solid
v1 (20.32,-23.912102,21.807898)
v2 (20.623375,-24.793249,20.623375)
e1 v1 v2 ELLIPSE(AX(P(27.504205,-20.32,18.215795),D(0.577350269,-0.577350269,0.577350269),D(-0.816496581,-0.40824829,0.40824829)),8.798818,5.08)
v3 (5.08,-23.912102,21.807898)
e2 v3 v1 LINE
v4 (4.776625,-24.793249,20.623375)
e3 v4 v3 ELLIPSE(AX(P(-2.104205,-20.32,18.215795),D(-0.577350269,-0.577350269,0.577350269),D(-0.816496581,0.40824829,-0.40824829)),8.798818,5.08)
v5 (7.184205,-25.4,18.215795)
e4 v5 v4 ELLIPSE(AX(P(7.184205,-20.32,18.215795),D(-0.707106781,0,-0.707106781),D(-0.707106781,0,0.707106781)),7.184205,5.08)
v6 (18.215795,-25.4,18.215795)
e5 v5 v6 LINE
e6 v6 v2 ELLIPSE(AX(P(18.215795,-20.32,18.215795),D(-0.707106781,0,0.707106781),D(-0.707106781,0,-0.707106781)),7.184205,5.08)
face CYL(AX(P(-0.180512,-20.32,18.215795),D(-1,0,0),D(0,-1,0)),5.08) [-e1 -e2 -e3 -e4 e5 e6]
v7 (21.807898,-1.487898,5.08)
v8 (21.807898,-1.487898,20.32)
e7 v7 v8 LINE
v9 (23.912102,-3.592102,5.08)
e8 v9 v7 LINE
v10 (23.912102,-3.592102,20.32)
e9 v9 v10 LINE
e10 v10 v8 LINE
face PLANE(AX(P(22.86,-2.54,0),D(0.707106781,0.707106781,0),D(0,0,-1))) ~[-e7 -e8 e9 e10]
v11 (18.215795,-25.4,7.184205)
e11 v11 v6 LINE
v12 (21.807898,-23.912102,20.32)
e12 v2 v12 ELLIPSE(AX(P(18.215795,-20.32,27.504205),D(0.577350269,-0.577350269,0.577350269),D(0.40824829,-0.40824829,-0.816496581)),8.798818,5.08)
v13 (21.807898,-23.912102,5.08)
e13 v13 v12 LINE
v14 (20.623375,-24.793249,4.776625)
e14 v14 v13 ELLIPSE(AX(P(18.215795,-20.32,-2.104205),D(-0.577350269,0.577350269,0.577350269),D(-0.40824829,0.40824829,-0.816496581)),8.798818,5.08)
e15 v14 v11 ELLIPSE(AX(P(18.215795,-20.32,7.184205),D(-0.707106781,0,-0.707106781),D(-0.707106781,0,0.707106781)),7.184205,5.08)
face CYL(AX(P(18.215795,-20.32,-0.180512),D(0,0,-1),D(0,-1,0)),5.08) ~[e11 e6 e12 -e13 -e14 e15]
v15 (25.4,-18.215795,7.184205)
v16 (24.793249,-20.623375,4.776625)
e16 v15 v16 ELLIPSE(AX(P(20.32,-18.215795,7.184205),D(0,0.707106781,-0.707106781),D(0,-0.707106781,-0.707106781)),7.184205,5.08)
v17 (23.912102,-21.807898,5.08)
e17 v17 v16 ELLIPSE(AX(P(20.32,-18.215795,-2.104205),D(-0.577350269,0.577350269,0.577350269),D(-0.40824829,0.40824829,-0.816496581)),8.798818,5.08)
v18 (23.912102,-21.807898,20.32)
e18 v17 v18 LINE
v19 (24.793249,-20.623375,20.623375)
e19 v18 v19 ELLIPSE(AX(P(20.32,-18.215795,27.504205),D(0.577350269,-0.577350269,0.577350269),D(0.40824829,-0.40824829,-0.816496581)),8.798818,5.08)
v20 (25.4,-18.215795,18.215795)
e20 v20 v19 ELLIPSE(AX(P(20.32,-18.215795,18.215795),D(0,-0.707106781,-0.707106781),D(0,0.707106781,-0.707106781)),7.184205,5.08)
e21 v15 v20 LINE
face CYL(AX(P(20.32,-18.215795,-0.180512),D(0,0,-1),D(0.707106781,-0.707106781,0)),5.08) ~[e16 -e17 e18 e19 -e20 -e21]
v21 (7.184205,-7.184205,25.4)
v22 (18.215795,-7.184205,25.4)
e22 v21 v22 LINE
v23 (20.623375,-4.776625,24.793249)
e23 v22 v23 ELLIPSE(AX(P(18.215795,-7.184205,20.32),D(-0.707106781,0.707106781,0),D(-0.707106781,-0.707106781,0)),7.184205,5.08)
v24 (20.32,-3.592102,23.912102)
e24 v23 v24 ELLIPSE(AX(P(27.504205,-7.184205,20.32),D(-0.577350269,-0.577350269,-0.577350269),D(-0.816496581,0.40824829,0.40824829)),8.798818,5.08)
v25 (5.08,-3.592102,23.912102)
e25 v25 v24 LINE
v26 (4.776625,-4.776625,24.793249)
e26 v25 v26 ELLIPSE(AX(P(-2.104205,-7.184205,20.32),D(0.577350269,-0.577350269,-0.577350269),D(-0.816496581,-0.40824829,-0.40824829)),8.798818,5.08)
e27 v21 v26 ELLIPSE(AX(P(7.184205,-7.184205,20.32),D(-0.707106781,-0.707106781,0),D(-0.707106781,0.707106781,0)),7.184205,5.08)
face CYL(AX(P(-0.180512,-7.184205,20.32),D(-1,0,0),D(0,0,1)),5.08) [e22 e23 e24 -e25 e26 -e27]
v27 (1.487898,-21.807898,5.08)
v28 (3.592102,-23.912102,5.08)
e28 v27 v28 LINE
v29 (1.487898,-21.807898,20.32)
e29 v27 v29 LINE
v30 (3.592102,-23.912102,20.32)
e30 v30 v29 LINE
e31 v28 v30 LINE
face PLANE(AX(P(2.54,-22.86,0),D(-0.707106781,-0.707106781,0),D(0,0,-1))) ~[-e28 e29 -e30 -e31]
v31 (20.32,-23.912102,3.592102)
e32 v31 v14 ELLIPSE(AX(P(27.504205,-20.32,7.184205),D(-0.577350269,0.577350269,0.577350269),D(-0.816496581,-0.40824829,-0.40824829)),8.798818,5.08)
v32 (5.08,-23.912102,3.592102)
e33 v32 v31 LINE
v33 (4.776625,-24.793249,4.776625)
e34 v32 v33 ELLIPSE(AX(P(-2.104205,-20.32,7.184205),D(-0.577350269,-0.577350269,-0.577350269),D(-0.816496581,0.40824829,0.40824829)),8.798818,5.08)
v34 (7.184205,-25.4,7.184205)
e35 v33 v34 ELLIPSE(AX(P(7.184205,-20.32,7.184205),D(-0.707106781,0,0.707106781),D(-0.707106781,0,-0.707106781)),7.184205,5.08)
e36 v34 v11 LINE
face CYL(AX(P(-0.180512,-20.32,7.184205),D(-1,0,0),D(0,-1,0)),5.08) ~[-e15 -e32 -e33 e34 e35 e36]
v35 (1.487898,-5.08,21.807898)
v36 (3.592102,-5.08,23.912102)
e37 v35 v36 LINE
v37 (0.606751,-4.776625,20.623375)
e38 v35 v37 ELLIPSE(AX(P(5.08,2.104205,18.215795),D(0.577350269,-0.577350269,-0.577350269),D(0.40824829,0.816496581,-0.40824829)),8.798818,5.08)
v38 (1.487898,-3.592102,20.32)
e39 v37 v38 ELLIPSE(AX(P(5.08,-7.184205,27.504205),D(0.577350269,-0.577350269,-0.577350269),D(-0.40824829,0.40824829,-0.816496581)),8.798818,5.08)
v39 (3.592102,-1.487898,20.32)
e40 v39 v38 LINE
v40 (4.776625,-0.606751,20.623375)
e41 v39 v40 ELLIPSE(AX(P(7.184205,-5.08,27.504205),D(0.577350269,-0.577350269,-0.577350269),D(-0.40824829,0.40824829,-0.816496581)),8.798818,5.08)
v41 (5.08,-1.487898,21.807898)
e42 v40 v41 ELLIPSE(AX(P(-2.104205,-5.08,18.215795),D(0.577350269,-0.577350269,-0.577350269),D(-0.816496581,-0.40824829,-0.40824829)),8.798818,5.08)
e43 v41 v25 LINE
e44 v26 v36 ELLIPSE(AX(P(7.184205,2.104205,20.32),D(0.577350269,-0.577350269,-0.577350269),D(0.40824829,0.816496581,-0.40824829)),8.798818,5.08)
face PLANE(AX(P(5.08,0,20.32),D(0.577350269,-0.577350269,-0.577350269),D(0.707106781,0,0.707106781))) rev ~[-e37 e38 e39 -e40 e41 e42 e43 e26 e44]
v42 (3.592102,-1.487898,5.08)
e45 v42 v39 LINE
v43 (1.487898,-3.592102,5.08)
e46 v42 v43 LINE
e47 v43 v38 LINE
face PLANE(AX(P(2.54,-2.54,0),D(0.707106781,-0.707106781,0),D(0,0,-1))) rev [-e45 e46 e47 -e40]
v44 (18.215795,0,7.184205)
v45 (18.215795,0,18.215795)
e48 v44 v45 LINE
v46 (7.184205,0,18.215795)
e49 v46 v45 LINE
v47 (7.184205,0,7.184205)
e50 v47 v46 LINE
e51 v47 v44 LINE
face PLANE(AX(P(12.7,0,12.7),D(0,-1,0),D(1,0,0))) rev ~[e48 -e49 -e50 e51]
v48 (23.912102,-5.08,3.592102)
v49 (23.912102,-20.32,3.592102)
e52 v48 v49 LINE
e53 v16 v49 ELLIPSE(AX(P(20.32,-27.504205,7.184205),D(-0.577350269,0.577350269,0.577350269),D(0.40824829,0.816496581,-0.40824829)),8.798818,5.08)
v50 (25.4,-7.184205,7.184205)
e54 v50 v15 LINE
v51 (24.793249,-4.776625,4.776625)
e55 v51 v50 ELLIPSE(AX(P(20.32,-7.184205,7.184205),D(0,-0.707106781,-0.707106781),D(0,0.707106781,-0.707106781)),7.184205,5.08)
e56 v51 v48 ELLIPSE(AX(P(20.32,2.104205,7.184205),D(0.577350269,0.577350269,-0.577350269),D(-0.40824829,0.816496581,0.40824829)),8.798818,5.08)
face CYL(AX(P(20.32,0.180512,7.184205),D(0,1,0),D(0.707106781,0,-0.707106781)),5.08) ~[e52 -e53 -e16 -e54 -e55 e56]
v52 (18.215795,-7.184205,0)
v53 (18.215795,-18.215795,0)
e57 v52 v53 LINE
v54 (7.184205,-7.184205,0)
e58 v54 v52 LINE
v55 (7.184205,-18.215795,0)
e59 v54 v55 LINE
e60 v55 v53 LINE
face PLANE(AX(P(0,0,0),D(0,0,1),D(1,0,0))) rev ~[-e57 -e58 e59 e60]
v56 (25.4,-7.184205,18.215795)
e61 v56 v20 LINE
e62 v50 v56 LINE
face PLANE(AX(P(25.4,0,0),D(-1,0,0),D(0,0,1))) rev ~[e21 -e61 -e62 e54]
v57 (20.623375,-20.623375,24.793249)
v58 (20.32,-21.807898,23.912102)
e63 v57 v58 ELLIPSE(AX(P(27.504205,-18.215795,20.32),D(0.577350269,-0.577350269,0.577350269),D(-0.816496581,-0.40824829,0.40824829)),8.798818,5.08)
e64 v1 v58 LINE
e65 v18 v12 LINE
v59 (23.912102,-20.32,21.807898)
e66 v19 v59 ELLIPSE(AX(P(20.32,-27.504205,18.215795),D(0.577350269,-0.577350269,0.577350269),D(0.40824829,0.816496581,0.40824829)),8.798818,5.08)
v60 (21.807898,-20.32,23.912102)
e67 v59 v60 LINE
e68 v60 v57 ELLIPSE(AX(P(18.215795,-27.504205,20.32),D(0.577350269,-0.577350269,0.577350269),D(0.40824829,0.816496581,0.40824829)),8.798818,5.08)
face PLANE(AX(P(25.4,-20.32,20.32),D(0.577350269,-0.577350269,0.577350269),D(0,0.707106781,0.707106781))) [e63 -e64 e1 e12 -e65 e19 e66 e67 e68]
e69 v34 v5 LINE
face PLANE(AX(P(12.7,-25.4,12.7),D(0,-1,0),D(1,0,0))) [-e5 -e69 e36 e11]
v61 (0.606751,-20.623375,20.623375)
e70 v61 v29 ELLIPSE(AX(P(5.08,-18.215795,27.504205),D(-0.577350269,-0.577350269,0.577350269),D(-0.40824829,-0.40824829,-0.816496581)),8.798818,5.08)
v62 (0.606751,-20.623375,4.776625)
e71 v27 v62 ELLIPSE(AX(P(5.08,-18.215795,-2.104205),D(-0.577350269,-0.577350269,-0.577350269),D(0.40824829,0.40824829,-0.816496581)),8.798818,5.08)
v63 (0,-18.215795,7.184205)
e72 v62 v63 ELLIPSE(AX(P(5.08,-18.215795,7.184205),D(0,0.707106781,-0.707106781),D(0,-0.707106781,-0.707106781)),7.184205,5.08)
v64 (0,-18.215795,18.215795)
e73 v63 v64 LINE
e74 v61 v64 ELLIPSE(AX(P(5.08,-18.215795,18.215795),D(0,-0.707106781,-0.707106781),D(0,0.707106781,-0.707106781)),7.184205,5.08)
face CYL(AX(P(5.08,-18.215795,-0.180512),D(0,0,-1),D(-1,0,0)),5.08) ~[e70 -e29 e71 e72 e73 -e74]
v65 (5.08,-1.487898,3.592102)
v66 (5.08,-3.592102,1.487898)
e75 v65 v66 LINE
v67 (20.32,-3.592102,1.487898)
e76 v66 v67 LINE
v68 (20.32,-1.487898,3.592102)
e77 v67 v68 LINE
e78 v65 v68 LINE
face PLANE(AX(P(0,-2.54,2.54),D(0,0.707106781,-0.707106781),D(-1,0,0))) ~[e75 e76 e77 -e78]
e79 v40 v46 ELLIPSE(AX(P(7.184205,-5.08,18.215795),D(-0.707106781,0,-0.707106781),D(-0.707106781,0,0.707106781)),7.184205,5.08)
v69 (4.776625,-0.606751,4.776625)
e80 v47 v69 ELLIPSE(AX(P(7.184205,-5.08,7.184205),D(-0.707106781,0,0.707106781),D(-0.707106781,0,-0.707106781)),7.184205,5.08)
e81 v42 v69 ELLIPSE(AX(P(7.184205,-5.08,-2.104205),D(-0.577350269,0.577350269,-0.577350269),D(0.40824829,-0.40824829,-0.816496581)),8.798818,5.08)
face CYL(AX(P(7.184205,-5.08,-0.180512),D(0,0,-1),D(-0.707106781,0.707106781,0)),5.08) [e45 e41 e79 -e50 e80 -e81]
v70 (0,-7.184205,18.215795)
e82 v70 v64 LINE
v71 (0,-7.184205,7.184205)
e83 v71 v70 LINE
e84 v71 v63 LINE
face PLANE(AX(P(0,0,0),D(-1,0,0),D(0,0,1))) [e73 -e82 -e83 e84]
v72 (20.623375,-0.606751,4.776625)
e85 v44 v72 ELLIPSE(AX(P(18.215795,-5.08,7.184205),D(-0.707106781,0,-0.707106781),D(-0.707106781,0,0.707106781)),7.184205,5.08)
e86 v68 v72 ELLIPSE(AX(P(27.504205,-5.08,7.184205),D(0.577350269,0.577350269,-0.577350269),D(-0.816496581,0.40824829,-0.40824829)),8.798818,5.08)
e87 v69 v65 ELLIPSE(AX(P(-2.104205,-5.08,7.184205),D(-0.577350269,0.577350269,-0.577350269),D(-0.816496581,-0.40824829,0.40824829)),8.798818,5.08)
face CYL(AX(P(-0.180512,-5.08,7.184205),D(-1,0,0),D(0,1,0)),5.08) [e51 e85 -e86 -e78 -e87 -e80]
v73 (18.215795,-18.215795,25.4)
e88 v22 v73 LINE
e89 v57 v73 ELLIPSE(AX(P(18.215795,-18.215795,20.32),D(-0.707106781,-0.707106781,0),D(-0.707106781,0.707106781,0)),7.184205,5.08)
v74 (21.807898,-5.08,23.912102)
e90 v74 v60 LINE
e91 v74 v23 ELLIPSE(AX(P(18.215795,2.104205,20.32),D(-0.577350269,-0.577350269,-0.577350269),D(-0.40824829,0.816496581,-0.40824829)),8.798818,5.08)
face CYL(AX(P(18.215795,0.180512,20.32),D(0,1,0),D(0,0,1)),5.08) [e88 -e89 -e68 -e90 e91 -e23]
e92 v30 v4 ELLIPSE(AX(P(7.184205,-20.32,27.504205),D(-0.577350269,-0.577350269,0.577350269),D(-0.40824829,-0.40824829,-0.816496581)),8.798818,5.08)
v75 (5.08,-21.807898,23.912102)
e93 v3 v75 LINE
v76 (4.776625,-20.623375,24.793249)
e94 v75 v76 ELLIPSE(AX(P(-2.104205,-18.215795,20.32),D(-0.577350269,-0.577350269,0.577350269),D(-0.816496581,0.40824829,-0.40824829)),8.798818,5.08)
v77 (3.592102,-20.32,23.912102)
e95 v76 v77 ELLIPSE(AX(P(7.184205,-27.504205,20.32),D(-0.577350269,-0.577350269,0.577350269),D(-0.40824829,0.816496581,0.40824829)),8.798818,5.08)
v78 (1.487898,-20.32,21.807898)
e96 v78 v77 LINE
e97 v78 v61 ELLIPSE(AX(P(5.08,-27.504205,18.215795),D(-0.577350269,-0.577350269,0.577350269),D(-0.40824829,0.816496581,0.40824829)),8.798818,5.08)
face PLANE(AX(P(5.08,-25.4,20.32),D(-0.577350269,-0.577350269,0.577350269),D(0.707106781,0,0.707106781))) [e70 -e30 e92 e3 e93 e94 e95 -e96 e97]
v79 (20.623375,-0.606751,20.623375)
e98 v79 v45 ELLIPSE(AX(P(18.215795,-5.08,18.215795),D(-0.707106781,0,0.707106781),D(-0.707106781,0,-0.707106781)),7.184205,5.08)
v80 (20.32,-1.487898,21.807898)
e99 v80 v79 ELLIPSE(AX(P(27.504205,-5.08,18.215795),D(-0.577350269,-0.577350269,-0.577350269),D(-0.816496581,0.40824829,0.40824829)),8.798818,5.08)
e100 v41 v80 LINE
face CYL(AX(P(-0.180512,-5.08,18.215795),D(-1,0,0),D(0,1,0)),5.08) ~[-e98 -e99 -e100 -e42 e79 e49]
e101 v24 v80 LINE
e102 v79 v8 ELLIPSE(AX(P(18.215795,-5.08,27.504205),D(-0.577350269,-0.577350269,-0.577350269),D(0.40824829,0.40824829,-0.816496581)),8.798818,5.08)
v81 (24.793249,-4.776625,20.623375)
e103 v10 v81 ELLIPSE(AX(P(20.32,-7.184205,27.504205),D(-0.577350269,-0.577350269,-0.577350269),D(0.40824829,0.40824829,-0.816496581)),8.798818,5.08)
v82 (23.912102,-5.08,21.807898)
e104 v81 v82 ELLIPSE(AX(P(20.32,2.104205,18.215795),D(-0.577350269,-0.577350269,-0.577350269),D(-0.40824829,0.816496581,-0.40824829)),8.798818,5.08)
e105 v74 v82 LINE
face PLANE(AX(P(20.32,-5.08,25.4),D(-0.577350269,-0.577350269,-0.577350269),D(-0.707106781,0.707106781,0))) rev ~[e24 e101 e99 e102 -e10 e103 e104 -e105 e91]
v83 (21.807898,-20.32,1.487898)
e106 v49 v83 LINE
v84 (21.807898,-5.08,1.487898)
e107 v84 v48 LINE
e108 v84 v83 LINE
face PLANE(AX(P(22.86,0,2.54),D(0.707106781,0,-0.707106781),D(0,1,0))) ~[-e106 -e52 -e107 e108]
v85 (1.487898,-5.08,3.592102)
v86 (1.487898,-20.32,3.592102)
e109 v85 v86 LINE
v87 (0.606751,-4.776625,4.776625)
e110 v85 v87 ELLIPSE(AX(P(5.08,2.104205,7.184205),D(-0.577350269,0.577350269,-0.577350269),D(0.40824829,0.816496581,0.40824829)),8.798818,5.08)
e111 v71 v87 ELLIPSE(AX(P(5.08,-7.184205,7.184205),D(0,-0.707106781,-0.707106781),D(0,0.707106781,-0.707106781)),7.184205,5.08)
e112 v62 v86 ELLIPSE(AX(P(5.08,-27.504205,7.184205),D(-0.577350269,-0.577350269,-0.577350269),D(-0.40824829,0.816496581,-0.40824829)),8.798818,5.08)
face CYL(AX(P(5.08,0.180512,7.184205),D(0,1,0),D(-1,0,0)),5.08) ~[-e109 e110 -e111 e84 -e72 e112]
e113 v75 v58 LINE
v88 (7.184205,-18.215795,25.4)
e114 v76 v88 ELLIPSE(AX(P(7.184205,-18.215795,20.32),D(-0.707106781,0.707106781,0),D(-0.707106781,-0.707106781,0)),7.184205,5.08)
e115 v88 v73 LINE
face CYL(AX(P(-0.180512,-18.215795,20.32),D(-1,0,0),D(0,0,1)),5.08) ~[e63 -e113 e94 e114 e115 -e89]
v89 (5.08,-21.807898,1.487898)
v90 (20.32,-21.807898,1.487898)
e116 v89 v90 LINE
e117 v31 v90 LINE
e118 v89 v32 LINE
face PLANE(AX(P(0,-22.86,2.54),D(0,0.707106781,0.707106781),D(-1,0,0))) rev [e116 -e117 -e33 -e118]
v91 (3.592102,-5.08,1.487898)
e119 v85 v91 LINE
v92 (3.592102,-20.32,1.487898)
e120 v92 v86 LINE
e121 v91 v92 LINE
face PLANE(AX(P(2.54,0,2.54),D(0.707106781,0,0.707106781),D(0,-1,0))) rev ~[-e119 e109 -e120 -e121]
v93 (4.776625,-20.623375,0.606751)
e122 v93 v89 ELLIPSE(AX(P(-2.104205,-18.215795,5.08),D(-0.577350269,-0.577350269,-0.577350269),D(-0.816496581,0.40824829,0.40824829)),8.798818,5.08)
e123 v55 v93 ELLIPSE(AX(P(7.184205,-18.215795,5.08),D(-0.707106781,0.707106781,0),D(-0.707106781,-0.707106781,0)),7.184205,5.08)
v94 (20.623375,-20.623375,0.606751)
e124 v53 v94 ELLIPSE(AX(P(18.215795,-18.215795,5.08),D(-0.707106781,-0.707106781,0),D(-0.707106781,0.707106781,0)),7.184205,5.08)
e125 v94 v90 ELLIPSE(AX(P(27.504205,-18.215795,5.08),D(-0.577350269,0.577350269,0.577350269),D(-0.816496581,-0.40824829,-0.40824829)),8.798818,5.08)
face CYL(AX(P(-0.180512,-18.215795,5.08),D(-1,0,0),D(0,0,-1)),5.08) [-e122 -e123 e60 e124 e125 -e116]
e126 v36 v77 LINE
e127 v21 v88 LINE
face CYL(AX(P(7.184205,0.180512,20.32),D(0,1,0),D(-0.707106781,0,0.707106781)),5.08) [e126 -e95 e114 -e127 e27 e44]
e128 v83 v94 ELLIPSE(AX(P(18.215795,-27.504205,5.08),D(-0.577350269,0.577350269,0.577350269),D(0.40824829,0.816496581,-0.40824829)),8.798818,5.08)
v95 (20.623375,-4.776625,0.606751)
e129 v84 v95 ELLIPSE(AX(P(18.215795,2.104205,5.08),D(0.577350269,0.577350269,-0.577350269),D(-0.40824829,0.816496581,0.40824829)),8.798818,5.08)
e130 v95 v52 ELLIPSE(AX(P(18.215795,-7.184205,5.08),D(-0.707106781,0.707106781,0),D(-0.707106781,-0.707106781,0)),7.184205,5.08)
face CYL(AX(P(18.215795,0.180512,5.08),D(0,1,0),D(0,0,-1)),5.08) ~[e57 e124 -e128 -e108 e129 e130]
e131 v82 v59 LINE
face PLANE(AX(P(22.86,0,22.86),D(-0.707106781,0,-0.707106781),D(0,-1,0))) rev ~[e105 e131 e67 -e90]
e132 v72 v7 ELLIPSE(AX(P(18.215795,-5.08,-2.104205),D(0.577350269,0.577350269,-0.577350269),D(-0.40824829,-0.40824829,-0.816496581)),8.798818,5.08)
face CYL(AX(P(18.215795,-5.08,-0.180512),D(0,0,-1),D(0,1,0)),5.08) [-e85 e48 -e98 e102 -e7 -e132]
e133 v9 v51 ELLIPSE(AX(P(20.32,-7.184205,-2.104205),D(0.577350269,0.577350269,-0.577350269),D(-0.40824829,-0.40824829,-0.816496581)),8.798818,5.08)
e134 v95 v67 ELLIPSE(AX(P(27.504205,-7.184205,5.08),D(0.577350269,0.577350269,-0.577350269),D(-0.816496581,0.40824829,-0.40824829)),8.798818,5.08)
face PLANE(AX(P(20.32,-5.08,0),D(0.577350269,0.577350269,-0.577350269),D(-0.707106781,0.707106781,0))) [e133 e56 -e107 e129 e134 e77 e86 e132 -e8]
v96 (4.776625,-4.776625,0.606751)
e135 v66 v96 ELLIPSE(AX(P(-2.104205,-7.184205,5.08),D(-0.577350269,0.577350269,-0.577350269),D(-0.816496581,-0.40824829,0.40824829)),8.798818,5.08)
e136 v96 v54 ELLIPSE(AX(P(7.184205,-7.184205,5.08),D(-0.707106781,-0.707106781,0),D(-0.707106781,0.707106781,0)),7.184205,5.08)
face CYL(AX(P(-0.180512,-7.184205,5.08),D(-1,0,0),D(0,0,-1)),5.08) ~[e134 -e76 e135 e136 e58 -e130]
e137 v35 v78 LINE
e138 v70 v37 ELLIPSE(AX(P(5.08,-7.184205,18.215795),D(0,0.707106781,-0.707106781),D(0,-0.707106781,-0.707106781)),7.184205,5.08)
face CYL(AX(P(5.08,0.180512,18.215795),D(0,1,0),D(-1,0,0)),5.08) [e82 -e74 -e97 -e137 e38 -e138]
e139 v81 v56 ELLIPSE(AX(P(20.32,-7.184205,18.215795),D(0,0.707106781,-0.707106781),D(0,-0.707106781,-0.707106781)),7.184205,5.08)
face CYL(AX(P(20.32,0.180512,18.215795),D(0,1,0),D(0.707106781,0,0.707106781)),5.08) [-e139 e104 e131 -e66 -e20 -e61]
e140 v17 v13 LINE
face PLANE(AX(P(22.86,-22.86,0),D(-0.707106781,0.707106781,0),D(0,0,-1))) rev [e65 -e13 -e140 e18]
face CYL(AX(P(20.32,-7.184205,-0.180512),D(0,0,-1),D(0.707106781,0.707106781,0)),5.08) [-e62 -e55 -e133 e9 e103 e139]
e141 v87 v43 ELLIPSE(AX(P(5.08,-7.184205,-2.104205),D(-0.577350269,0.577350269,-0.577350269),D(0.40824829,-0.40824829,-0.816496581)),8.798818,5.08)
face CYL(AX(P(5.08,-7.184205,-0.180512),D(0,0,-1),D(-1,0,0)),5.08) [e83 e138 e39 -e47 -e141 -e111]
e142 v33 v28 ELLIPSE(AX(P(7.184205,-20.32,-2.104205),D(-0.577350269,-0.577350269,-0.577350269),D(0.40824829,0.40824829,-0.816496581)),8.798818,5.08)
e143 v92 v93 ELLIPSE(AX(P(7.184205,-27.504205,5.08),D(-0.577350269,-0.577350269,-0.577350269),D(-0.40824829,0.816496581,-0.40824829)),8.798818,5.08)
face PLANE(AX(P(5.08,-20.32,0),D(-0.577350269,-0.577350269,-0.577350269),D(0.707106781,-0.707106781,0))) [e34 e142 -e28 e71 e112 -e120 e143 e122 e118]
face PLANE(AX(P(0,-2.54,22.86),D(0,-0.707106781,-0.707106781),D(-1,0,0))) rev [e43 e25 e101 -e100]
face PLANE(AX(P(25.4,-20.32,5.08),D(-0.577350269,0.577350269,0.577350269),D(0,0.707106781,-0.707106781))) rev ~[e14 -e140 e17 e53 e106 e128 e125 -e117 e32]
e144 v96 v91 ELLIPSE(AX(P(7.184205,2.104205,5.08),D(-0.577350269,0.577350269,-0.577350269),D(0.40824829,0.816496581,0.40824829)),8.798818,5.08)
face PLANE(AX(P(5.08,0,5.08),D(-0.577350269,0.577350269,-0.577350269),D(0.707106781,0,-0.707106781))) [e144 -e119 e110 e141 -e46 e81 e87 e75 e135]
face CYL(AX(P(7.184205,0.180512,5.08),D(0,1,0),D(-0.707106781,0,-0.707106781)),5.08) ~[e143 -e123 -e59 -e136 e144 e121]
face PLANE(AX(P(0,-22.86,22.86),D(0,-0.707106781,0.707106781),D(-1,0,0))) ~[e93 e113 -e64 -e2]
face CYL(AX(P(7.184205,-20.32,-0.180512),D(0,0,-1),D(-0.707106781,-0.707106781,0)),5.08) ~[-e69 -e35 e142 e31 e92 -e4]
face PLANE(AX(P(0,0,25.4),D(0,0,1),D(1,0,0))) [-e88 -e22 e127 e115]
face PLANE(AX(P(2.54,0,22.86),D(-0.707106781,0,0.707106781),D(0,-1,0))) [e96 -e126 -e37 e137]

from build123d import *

# Parameters (mm, degrees)
F0_W        = 25.4
F0_H        = 25.4
F1_DEPTH    = 25.4
F2_SIZE     = 5.08
F3_T1_DEPTH = 25.7610244843
F3_T3_DEPTH = 25.7610244843
F3_T5_DEPTH = 25.7610244843


# Not quite as in the source:
# - a fillet or chamfer that OpenCascade refuses, or shapes differently, is made with other operations: its cross-section is extruded or revolved along the edge and cut away or added


with BuildPart() as f1:
    # F0 (on Front) → F1 (new body)
    with BuildSketch(Plane.XZ):
        with Locations((12.7, 12.7)):
            Rectangle(F0_W, F0_H)
    extrude(amount=F1_DEPTH)

    # F2
    f2_edges = [f1.edges().sort_by_distance(p)[0] for p in [
        (0, -12.7, 25.4),
        (0, -25.4, 12.7),
        (12.7, -25.4, 25.4),
        (0, -12.7, 0),
        (12.7, -25.4, 0),
        (0, 0, 12.7),
        (25.4, -25.4, 12.7),
        (25.4, 0, 12.7),
        (25.4, -12.7, 25.4),
        (25.4, -12.7, 0),
        (12.7, 0, 25.4),
        (12.7, 0, 0),
    ]]
    chamfer(f2_edges, length=F2_SIZE)

    # F3: fillet of radius 5.08 on 24 edges, made by hand

    # F3_s2 → F3_t1 (cut)
    with BuildSketch(Plane.YZ.offset(-0.1805122421)):
        with BuildLine():
            ThreePointArc((-25.4, 18.2157951031), (-25.0133080252, 20.1598269396), (-23.9121024484, 21.8078975516))
            Line((-23.9121024484, 21.8078975516), (-25.4, 20.32))
            Line((-25.4, 20.32), (-25.4, 18.2157951031))
        make_face()
        with BuildLine():
            ThreePointArc((-25.4, 7.1842048969), (-25.0133080252, 5.2401730604), (-23.9121024484, 3.5921024484))
            Line((-23.9121024484, 3.5921024484), (-25.4, 5.08))
            Line((-25.4, 5.08), (-25.4, 7.1842048969))
        make_face()
        with BuildLine():
            ThreePointArc((0, 18.2157951031), (-0.3866919748, 20.1598269396), (-1.4878975516, 21.8078975516))
            Line((-1.4878975516, 21.8078975516), (0, 20.32))
            Line((0, 20.32), (0, 18.2157951031))
        make_face()
        with BuildLine():
            ThreePointArc((0, 7.1842048969), (-0.3866919748, 5.2401730604), (-1.4878975516, 3.5921024484))
            Line((-1.4878975516, 3.5921024484), (0, 5.08))
            Line((0, 5.08), (0, 7.1842048969))
        make_face()
        with BuildLine():
            ThreePointArc((-18.2157951031, 0), (-20.1598269396, 0.3866919748), (-21.8078975516, 1.4878975516))
            Line((-21.8078975516, 1.4878975516), (-20.32, 0))
            Line((-20.32, 0), (-18.2157951031, 0))
        make_face()
        with BuildLine():
            ThreePointArc((-7.1842048969, 0), (-5.2401730604, 0.3866919748), (-3.5921024484, 1.4878975516))
            Line((-3.5921024484, 1.4878975516), (-5.08, 0))
            Line((-5.08, 0), (-7.1842048969, 0))
        make_face()
        with BuildLine():
            ThreePointArc((-18.2157951031, 25.4), (-20.1598269396, 25.0133080252), (-21.8078975516, 23.9121024484))
            Line((-21.8078975516, 23.9121024484), (-20.32, 25.4))
            Line((-20.32, 25.4), (-18.2157951031, 25.4))
        make_face()
        with BuildLine():
            ThreePointArc((-7.1842048969, 25.4), (-5.2401730604, 25.0133080252), (-3.5921024484, 23.9121024484))
            Line((-3.5921024484, 23.9121024484), (-5.08, 25.4))
            Line((-5.08, 25.4), (-7.1842048969, 25.4))
        make_face()
    extrude(amount=F3_T1_DEPTH, mode=Mode.SUBTRACT)

    # F3_s4 → F3_t3 (cut)
    with BuildSketch(Plane.XY.offset(-0.1805122421)):
        with BuildLine():
            ThreePointArc((3.5921024484, -23.9121024484), (5.2401730604, -25.0133080252), (7.1842048969, -25.4))
            Line((7.1842048969, -25.4), (5.08, -25.4))
            Line((5.08, -25.4), (3.5921024484, -23.9121024484))
        make_face()
        with BuildLine():
            ThreePointArc((18.2157951031, -25.4), (20.1598269396, -25.0133080252), (21.8078975516, -23.9121024484))
            Line((21.8078975516, -23.9121024484), (20.32, -25.4))
            Line((20.32, -25.4), (18.2157951031, -25.4))
        make_face()
        with BuildLine():
            ThreePointArc((0, -7.1842048969), (0.3866919748, -5.2401730604), (1.4878975516, -3.5921024484))
            Line((1.4878975516, -3.5921024484), (0, -5.08))
            Line((0, -5.08), (0, -7.1842048969))
        make_face()
        with BuildLine():
            ThreePointArc((0, -18.2157951031), (0.3866919748, -20.1598269396), (1.4878975516, -21.8078975516))
            Line((1.4878975516, -21.8078975516), (0, -20.32))
            Line((0, -20.32), (0, -18.2157951031))
        make_face()
        with BuildLine():
            ThreePointArc((18.2157951031, 0), (20.1598269396, -0.3866919748), (21.8078975516, -1.4878975516))
            Line((21.8078975516, -1.4878975516), (20.32, 0))
            Line((20.32, 0), (18.2157951031, 0))
        make_face()
        with BuildLine():
            ThreePointArc((3.5921024484, -1.4878975516), (5.2401730604, -0.3866919748), (7.1842048969, 0))
            Line((7.1842048969, 0), (5.08, 0))
            Line((5.08, 0), (3.5921024484, -1.4878975516))
        make_face()
        with BuildLine():
            ThreePointArc((23.9121024484, -21.8078975516), (25.0133080252, -20.1598269396), (25.4, -18.2157951031))
            Line((25.4, -18.2157951031), (25.4, -20.32))
            Line((25.4, -20.32), (23.9121024484, -21.8078975516))
        make_face()
        with BuildLine():
            ThreePointArc((23.9121024484, -3.5921024484), (25.0133080252, -5.2401730604), (25.4, -7.1842048969))
            Line((25.4, -7.1842048969), (25.4, -5.08))
            Line((25.4, -5.08), (23.9121024484, -3.5921024484))
        make_face()
    extrude(amount=F3_T3_DEPTH, mode=Mode.SUBTRACT)

    # F3_s6 → F3_t5 (cut)
    with BuildSketch(Plane.XZ.offset(-0.1805122421)):
        with BuildLine():
            ThreePointArc((0, 18.2157951031), (0.3866919748, 20.1598269396), (1.4878975516, 21.8078975516))
            Line((1.4878975516, 21.8078975516), (0, 20.32))
            Line((0, 20.32), (0, 18.2157951031))
        make_face()
        with BuildLine():
            ThreePointArc((0, 7.1842048969), (0.3866919748, 5.2401730604), (1.4878975516, 3.5921024484))
            Line((1.4878975516, 3.5921024484), (0, 5.08))
            Line((0, 5.08), (0, 7.1842048969))
        make_face()
        with BuildLine():
            ThreePointArc((23.9121024484, 21.8078975516), (25.0133080252, 20.1598269396), (25.4, 18.2157951031))
            Line((25.4, 18.2157951031), (25.4, 20.32))
            Line((25.4, 20.32), (23.9121024484, 21.8078975516))
        make_face()
        with BuildLine():
            ThreePointArc((23.9121024484, 3.5921024484), (25.0133080252, 5.2401730604), (25.4, 7.1842048969))
            Line((25.4, 7.1842048969), (25.4, 5.08))
            Line((25.4, 5.08), (23.9121024484, 3.5921024484))
        make_face()
        with BuildLine():
            ThreePointArc((3.5921024484, 1.4878975516), (5.2401730604, 0.3866919748), (7.1842048969, 0))
            Line((7.1842048969, 0), (5.08, 0))
            Line((5.08, 0), (3.5921024484, 1.4878975516))
        make_face()
        with BuildLine():
            ThreePointArc((18.2157951031, 0), (20.1598269396, 0.3866919748), (21.8078975516, 1.4878975516))
            Line((21.8078975516, 1.4878975516), (20.32, 0))
            Line((20.32, 0), (18.2157951031, 0))
        make_face()
        with BuildLine():
            ThreePointArc((18.2157951031, 25.4), (20.1598269396, 25.0133080252), (21.8078975516, 23.9121024484))
            Line((21.8078975516, 23.9121024484), (20.32, 25.4))
            Line((20.32, 25.4), (18.2157951031, 25.4))
        make_face()
        with BuildLine():
            ThreePointArc((3.5921024484, 23.9121024484), (5.2401730604, 25.0133080252), (7.1842048969, 25.4))
            Line((7.1842048969, 25.4), (5.08, 25.4))
            Line((5.08, 25.4), (3.5921024484, 23.9121024484))
        make_face()
    extrude(amount=F3_T5_DEPTH, mode=Mode.SUBTRACT)


solid = f1.part
